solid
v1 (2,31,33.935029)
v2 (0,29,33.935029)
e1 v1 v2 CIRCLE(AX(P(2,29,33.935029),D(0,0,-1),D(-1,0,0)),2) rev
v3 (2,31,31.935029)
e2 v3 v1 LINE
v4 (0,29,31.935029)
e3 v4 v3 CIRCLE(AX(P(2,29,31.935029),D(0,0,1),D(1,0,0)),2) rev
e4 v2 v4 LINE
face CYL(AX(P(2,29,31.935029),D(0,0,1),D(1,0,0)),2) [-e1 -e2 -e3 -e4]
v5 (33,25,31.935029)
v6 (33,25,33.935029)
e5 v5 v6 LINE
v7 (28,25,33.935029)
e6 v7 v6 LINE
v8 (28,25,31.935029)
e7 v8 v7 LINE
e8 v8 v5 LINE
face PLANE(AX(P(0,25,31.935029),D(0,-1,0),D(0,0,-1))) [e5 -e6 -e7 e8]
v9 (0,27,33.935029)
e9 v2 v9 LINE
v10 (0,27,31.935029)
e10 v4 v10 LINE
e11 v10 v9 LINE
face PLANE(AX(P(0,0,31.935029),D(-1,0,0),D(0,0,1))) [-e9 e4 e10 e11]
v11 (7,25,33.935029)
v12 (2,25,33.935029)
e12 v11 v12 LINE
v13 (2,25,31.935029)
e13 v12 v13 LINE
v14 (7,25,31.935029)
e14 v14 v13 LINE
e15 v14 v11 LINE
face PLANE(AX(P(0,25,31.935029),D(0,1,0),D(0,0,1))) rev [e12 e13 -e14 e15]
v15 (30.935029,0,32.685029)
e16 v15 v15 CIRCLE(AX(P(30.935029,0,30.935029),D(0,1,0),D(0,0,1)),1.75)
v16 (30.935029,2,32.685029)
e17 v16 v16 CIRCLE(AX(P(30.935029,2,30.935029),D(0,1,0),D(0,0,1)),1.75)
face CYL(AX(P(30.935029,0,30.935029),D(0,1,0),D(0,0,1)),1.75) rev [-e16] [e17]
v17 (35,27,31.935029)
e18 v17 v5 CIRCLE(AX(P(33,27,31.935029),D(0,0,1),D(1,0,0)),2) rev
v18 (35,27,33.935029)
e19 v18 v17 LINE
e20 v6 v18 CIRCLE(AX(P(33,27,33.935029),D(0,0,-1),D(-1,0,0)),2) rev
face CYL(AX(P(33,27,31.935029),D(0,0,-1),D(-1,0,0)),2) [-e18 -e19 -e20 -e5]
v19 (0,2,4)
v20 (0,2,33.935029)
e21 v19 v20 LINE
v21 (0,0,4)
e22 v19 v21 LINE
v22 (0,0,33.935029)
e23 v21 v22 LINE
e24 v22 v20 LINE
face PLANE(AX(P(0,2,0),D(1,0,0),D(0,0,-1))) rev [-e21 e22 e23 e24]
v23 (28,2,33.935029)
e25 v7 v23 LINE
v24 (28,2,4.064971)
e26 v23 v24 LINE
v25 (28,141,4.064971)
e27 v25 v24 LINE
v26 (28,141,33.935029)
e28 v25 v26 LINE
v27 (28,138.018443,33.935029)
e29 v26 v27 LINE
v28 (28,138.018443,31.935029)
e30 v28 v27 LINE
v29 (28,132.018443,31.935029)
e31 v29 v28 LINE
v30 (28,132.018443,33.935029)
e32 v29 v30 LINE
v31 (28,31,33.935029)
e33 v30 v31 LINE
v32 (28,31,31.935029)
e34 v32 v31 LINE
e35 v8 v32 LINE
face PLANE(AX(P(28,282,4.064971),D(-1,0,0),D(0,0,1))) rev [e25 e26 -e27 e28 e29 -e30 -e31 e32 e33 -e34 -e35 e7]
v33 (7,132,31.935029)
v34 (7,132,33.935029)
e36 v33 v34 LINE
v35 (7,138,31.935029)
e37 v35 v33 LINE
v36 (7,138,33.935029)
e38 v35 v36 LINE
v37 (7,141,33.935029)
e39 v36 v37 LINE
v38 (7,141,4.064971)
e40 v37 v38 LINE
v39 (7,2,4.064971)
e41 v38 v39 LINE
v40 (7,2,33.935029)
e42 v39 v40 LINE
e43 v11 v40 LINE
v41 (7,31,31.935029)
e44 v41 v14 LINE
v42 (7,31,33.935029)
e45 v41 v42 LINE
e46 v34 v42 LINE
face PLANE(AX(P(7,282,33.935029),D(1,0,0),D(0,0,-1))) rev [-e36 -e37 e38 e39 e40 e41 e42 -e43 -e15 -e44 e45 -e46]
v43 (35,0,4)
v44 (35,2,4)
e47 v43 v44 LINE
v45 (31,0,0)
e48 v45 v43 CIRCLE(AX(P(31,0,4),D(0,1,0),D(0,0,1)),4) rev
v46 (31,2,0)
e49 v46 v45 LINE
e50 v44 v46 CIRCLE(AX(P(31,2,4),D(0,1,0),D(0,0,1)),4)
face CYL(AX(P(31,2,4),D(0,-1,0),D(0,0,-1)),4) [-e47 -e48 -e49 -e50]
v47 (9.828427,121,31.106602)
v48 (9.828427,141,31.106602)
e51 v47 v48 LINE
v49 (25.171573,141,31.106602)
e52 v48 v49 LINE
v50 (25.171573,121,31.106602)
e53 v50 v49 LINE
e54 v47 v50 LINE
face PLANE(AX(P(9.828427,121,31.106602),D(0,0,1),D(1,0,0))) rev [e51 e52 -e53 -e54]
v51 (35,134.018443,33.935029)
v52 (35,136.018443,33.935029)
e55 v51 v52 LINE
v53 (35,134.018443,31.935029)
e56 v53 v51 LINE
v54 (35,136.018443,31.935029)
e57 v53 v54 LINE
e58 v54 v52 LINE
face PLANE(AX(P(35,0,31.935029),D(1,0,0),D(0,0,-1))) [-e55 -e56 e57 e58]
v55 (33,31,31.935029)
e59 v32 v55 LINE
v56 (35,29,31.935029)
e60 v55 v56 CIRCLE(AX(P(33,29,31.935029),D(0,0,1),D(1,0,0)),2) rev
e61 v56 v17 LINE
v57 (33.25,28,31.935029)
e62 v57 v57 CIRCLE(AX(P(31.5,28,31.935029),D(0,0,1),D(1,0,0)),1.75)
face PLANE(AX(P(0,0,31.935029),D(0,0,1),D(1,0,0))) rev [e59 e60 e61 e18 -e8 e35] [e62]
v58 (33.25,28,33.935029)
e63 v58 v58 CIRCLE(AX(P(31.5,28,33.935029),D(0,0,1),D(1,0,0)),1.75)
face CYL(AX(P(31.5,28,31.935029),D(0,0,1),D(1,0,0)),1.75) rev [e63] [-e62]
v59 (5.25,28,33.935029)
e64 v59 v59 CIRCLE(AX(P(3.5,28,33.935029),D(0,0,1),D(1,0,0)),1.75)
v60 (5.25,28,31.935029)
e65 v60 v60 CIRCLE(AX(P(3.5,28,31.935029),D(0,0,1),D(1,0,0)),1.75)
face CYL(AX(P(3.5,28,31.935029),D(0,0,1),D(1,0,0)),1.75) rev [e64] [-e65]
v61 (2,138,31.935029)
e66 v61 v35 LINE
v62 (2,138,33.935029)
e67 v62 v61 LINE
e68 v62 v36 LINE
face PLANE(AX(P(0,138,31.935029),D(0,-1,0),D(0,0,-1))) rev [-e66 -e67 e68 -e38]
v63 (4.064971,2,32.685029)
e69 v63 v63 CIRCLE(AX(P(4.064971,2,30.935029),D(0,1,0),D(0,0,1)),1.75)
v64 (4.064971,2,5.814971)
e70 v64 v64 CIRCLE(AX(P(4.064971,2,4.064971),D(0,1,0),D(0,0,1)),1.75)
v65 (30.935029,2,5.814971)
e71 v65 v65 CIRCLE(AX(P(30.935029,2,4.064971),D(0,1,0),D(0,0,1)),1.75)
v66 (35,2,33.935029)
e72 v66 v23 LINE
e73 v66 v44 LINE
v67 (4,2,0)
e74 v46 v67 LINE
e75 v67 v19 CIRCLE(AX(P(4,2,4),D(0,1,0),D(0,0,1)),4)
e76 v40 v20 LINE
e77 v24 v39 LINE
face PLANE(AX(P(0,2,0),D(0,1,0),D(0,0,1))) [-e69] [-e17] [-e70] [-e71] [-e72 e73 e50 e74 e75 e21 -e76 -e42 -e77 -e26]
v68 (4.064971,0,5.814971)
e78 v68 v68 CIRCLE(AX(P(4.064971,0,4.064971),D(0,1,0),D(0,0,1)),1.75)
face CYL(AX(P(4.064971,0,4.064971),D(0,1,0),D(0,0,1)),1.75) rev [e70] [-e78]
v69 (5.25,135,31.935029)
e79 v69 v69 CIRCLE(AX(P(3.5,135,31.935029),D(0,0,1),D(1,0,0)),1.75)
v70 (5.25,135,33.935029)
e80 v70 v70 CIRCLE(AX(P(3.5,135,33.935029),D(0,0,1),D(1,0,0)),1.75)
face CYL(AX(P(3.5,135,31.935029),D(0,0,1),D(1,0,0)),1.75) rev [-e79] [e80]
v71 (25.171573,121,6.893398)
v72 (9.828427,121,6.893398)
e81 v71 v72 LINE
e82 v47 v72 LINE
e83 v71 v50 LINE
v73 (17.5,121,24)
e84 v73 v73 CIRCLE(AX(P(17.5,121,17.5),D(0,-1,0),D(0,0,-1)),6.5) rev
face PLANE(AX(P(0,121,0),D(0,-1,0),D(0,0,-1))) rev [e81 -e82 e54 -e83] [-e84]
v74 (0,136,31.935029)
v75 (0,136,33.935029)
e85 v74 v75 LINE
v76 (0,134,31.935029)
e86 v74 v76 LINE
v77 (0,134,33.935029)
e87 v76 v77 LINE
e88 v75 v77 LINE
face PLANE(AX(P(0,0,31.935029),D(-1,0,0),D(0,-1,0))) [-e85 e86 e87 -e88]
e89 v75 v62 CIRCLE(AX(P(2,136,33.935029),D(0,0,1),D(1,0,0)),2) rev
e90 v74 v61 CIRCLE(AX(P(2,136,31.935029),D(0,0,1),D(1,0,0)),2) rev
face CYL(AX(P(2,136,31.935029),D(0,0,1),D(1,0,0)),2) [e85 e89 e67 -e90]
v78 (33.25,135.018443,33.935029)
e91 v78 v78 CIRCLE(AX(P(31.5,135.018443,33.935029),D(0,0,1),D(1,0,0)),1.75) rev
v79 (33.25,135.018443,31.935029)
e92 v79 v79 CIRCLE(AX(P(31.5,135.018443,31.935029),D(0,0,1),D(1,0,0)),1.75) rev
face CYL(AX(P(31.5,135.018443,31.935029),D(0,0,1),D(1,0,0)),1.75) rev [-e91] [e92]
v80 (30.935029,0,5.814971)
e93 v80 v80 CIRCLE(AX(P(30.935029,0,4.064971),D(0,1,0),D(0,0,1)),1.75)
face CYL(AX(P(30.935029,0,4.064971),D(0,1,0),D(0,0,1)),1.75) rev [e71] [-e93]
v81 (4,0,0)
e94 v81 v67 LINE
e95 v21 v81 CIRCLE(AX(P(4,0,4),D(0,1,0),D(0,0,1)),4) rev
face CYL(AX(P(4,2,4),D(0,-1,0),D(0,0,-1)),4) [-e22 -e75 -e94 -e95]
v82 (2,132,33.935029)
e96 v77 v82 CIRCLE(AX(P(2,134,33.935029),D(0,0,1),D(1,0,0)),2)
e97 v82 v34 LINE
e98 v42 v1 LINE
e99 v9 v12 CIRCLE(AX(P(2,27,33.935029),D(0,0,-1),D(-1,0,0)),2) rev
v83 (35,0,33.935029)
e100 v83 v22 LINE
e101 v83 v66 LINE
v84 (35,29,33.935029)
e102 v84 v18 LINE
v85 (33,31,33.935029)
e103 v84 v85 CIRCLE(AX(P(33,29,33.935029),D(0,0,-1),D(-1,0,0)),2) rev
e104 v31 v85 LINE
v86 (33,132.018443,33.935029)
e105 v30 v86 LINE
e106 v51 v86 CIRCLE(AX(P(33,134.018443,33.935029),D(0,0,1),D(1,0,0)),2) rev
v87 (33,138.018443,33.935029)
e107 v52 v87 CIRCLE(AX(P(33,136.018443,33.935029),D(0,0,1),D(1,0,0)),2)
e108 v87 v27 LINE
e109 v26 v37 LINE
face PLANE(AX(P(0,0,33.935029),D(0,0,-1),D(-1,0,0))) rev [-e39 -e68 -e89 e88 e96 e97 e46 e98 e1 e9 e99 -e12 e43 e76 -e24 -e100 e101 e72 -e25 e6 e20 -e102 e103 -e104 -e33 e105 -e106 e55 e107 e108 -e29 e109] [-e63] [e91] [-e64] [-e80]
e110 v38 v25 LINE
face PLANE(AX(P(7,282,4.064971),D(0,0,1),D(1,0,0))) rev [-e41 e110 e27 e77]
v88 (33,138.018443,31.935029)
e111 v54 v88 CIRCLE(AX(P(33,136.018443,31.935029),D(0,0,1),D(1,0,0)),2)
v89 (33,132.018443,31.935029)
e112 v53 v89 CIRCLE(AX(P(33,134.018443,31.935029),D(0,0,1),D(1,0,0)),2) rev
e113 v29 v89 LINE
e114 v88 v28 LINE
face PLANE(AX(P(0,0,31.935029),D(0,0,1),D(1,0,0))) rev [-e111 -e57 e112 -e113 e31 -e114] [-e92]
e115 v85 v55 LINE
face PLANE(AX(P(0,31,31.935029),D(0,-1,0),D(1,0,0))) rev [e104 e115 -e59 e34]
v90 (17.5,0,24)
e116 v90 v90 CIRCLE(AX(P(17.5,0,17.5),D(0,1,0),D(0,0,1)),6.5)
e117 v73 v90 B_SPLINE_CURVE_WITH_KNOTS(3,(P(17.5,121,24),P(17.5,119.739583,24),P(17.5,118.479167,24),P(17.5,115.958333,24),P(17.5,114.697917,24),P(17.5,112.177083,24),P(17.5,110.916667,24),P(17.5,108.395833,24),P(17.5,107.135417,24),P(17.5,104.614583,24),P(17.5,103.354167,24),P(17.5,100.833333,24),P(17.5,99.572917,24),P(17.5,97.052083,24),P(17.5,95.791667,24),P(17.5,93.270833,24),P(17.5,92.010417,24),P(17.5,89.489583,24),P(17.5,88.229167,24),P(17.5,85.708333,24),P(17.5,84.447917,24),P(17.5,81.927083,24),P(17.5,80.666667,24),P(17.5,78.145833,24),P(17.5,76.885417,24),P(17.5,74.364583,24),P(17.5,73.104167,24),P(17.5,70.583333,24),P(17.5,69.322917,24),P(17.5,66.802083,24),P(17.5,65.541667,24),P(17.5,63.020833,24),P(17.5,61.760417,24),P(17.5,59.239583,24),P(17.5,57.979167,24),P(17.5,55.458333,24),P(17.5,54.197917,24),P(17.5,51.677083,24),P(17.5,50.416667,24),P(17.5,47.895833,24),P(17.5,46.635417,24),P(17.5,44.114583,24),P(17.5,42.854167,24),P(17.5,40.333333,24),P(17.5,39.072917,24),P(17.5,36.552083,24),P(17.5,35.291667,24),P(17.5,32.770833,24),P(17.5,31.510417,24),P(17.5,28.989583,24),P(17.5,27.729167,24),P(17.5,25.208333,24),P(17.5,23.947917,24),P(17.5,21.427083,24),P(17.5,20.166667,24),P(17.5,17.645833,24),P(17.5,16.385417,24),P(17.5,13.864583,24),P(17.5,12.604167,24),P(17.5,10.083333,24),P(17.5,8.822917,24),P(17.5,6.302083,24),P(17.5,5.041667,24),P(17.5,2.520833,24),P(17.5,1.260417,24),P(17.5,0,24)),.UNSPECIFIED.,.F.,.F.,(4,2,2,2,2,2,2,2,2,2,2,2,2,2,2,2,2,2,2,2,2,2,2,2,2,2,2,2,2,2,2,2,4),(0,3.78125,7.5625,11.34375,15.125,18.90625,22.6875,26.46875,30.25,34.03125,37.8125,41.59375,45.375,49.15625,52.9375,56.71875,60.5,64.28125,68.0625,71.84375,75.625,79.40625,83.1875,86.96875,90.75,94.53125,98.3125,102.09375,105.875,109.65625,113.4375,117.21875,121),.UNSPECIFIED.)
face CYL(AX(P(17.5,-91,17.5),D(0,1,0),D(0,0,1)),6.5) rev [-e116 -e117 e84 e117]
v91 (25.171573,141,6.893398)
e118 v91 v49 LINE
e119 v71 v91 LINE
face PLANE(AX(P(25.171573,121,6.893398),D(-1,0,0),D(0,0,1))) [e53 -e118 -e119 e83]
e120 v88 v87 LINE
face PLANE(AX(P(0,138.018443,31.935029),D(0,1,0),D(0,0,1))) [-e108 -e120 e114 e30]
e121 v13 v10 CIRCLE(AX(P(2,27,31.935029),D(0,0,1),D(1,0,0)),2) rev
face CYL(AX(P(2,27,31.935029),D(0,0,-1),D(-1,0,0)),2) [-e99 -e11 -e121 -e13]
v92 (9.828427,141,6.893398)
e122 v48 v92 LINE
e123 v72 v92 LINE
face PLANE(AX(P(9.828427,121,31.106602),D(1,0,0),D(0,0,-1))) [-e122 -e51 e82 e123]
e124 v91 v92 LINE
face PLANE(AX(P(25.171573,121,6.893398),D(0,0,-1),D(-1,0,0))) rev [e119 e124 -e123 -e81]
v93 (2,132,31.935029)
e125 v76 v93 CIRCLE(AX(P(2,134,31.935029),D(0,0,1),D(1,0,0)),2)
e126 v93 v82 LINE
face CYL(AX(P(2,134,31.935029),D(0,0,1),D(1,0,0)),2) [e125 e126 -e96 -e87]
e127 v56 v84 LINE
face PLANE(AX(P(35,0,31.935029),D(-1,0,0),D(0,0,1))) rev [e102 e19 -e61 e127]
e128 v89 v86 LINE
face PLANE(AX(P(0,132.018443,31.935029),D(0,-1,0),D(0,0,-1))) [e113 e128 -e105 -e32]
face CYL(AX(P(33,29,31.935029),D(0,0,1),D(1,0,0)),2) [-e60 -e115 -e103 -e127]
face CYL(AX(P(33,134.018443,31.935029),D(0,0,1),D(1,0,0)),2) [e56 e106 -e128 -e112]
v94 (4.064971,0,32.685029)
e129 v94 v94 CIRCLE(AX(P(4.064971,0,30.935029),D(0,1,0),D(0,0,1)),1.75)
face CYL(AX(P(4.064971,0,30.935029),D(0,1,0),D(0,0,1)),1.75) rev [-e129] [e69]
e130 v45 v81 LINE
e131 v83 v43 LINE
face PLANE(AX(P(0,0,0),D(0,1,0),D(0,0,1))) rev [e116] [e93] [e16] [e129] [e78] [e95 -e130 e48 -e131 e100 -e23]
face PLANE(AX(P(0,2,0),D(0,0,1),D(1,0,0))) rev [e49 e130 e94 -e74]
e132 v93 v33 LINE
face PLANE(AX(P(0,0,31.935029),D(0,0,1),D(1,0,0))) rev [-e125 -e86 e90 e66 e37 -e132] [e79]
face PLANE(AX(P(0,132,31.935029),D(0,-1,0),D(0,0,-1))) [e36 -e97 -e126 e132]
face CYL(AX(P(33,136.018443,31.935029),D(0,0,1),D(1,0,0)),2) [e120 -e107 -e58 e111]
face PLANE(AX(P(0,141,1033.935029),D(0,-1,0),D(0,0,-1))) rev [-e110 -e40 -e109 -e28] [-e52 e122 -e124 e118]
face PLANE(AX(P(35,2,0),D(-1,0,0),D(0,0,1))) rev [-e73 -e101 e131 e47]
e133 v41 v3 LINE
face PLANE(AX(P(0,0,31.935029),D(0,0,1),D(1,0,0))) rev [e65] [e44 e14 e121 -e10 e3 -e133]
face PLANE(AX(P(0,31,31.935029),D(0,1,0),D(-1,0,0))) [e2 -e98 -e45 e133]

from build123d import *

# Parameters (mm, degrees)
ESQUISSE1_W                   = 35
ESQUISSE1_H                   = 35
BOSS_EXTRU_1_DEPTH            = 2
ESQUISSE2_R                   = 1.75
ESQUISSE2_W                   = 35
ESQUISSE2_H                   = 1.064971157
ENL_V_MAT_EXTRU_1_DEPTH       = 2
BOSS_EXTRU_2_DEPTH            = 280
ESQUISSE5_W                   = 7
ESQUISSE5_H                   = 6
ESQUISSE5_R                   = 1.75
BOSS_EXTRU_3_DEPTH            = 2
ESQUISSE6_R                   = 1.75
BOSS_EXTRU_4_DEPTH            = 2
ESQUISSE10_W                  = 35
ESQUISSE10_H                  = 33.935028843
ESQUISSE10_R                  = 1.75
BOSS_EXTRU_5_DEPTH            = 2
ESQUISSE15_R                  = 6.5
ESQUISSE15_R_2                = 1.75
ENL_V_MAT_EXTRU_2_DEPTH       = 373
CONG_1_R                      = 2
CONG_2_R                      = 4
EXTRU_MINCE1_START            = -2
EXTRU_MINCE1_OUTLINE_W        = 35
EXTRU_MINCE1_OUTLINE_H        = 10
EXTRU_MINCE1_DEPTH            = 2
BOSS_EXTRU_7_DEPTH            = 62.5
BOSS_EXTRU_8_DEPTH            = 160
ENL_V_MAT_EXTRU_4_DEPTH       = 15
BOSS_EXTRU_31_DEPTH           = 69.5
BOSS_EXTRU_31_DEPTH_BACK      = 90.5
ESQUISSE29_W                  = 0.210775501
ESQUISSE29_H                  = 2
BOSS_EXTRU_32_DEPTH           = 160
ENL_V_MAT_EXTRU_7_DEPTH       = 10
ENL_V_MAT_EXTRU_7_DEPTH_BACK  = 5
ESQUISSE34_W                  = 144
ESQUISSE34_H                  = 64.710678118
ENL_V_MAT_EXTRU_8_DEPTH       = 2
ESQUISSE35_R                  = 1.5
BOSS_EXTRU_35_DEPTH           = 2
BOSS_EXTRU_36_START           = -2
ESQUISSE36_R                  = 1.5
BOSS_EXTRU_36_DEPTH           = 2
BOSS_EXTRU_37_DEPTH           = 21
BOSS_EXTRU_38_DEPTH           = 28
ESQUISSE42_W                  = 17
ESQUISSE42_H                  = 6
ENL_V_MAT_EXTRU_9_DEPTH       = 124
ESQUISSE43_R                  = 1.1
ENL_V_MAT_EXTRU_11_DEPTH      = 50
ESQUISSE45_R                  = 1.5
ENL_V_MAT_EXTRU_12_DEPTH      = 50
ESQUISSE47_R                  = 1.75
BOSS_EXTRU_40_DEPTH           = 2
ENL_V_MAT_EXTRU_13_DEPTH      = 2
ESQUISSE49_R                  = 1.75
BOSS_EXTRU_41_DEPTH           = 2
ESQUISSE50_W                  = 12.927363302
ESQUISSE50_H                  = 18
ENL_V_MAT_EXTRU_14_DEPTH      = 2
ESQUISSE51_R                  = 1.75
BOSS_EXTRU_42_DEPTH           = 2
ENL_V_MAT_EXTRU_15_DEPTH      = 1000
ENL_V_MAT_EXTRU_15_DEPTH_BACK = 1000
ESQUISSE53_W                  = 15.34314575
ESQUISSE53_H                  = 24.213203648
ENL_V_MAT_EXTRU_16_DEPTH      = 20


# Read off the part's stored shape, not the designer's step: Extru.-Mince1
with BuildPart() as part:
    # Esquisse1 → Boss.-Extru.1 (new body)
    with BuildSketch(Plane(origin=(0, 0, 0), x_dir=(1, 0, 0), z_dir=(0, 1, 0))):
        with Locations((17.5, -17.5)):
            Rectangle(ESQUISSE1_W, ESQUISSE1_H)
    extrude(amount=BOSS_EXTRU_1_DEPTH)

    # Esquisse2 → Enlèv. mat.-Extru.1 (cut)
    with BuildSketch(Plane(origin=(0, 2, 0), x_dir=(1, 0, 0), z_dir=(0, 1, 0))):
        with Locations(Location((30.935029054, -4.064971369, 0), (0, 0, 270))):
            Circle(ESQUISSE2_R)
        with Locations(Location((30.935028843, -30.935028843, 0), (0, 0, 270))):
            Circle(ESQUISSE2_R)
        with Locations(Location((4.064971369, -4.064970946, 0), (0, 0, 270))):
            Circle(ESQUISSE2_R)
        with Locations(Location((4.064971157, -30.935028843, 0), (0, 0, 270))):
            Circle(ESQUISSE2_R)
        with Locations((17.5, -34.467514421)):
            Rectangle(ESQUISSE2_W, ESQUISSE2_H)
    extrude(amount=-ENL_V_MAT_EXTRU_1_DEPTH, mode=Mode.SUBTRACT)

    # Esquisse4 → Boss.-Extru.2 (add)
    with BuildSketch(Plane(origin=(0, 2, 0), x_dir=(1, 0, 0), z_dir=(0, 1, 0))):
        Polygon((17.5, -33.935028843), (7, -33.935028843), (7, -4.064970946), (28, -4.064970946), (28, -33.935028843), align=None)
    extrude(amount=BOSS_EXTRU_2_DEPTH)

    # Esquisse5 → Boss.-Extru.3 (add)
    # profile 1 of 4: a face of its own
    with BuildSketch(Plane.XY.offset(33.935028843)):
        with Locations((31.5, 254)):
            Rectangle(ESQUISSE5_W, ESQUISSE5_H)
        with Locations((31.5, 254)):
            Circle(ESQUISSE5_R, mode=Mode.SUBTRACT)
    # profile 2 of 4: a face of its own
    with BuildSketch(Plane.XY.offset(33.935028843)):
        with Locations((3.5, 254)):
            Rectangle(ESQUISSE5_W, ESQUISSE5_H)
        with Locations((3.5, 254)):
            Circle(ESQUISSE5_R, mode=Mode.SUBTRACT)
    # profile 3 of 4: a face of its own
    with BuildSketch(Plane.XY.offset(33.935028843)):
        with Locations((31.5, 28)):
            Rectangle(ESQUISSE5_W, ESQUISSE5_H)
        with Locations((31.5, 28)):
            Circle(ESQUISSE5_R, mode=Mode.SUBTRACT)
    # profile 4 of 4: a face of its own
    with BuildSketch(Plane.XY.offset(33.935028843)):
        with Locations((3.5, 28)):
            Rectangle(ESQUISSE5_W, ESQUISSE5_H)
        with Locations((3.5, 28)):
            Circle(ESQUISSE5_R, mode=Mode.SUBTRACT)
    extrude(amount=-BOSS_EXTRU_3_DEPTH)

    # Esquisse6 → Boss.-Extru.4 (add)
    # profile 1 of 2: a face of its own
    with BuildSketch(Plane.XY.offset(33.935028843)):
        Polygon((7, 144), (0, 144), (0, 141), (0, 138), (7, 138), (7, 141), align=None)
        with Locations((3.5, 141)):
            Circle(ESQUISSE6_R, mode=Mode.SUBTRACT)
    # profile 2 of 2: a face of its own
    with BuildSketch(Plane.XY.offset(33.935028843)):
        Polygon((35, 144), (28, 144), (28, 141), (28, 138), (35, 138), (35, 141), align=None)
        with Locations((31.5, 141)):
            Circle(ESQUISSE6_R, mode=Mode.SUBTRACT)
    extrude(amount=-BOSS_EXTRU_4_DEPTH)

    # Esquisse10 → Boss.-Extru.5 (add)
    with BuildSketch(Plane(origin=(0, 282, 0), x_dir=(1, 0, 0), z_dir=(0, 1, 0))):
        with Locations((17.5, -16.967514422)):
            Rectangle(ESQUISSE10_W, ESQUISSE10_H)
        with Locations(Location((30.935028843, -30.935028843, 0), (0, 0, 270))):
            Circle(ESQUISSE10_R, mode=Mode.SUBTRACT)
        with Locations(Location((30.935028631, -4.064970946, 0), (0, 0, 270.000013863))):
            Circle(ESQUISSE10_R, mode=Mode.SUBTRACT)
        with Locations(Location((4.064970946, -4.064971369, 0), (0, 0, 270.000013863))):
            Circle(ESQUISSE10_R, mode=Mode.SUBTRACT)
        with Locations(Location((4.064971157, -30.935028843, 0), (0, 0, 270))):
            Circle(ESQUISSE10_R, mode=Mode.SUBTRACT)
    extrude(amount=-BOSS_EXTRU_5_DEPTH)

    # Esquisse15 → Enlèv. mat.-Extru.2 (cut)
    with BuildSketch(Plane(origin=(0, 282, 0), x_dir=(1, 0, 0), z_dir=(0, 1, 0))):
        with Locations(Location((17.5, -17.5, 0), (0, 0, 270))):
            Circle(ESQUISSE15_R)
        with Locations(Location((30.935029054, -4.064971369, 0), (0, 0, 270))):
            Circle(ESQUISSE15_R_2)
    extrude(amount=-ENL_V_MAT_EXTRU_2_DEPTH, mode=Mode.SUBTRACT)

    # Congé1
    cong_1_edges = [part.edges().sort_by_distance(p)[0] for p in [
        (0, 31, 32.935028843),
        (0, 25, 32.935028843),
        (0, 144, 32.935028843),
        (0, 138, 32.935028843),
        (35, 144, 32.935028843),
        (35, 138, 32.935028843),
        (35, 257, 32.935028843),
        (35, 251, 32.935028843),
        (0, 251, 32.935028843),
        (0, 257, 32.935028843),
        (35, 31, 32.935028843),
        (35, 25, 32.935028843),
    ]]
    fillet(cong_1_edges, radius=CONG_1_R)

    # Congé2
    cong_2_edges = [part.edges().sort_by_distance(p)[0] for p in [
        (35, 281, 0),
        (0, 281, 0),
        (0, 1, 0),
        (35, 1, 0),
    ]]
    fillet(cong_2_edges, radius=CONG_2_R)

    # Extru.-Mince1 outline → Extru.-Mince1 (add)
    with BuildSketch(Plane(origin=(0, 282, 0), x_dir=(1, 0, 0), z_dir=(0, 1, 0)).offset(EXTRU_MINCE1_START)):
        with Locations((17.5, -38.935028843)):
            Rectangle(EXTRU_MINCE1_OUTLINE_W, EXTRU_MINCE1_OUTLINE_H)
    extrude(amount=EXTRU_MINCE1_DEPTH)

    # Esquisse20 → Boss.-Extru.7 (add)
    with BuildSketch(Plane.ZY):
        Polygon((43.935028843, 282), (114.645706961, 211.289321881), (110.645706961, 211.289321881), (41.935028843, 280), (34.145804344, 280), (34.145804344, 282), align=None)
    extrude(amount=BOSS_EXTRU_7_DEPTH)

    # Esquisse21 → Boss.-Extru.8 (add)
    with BuildSketch(Plane.ZY.offset(62.5)):
        Polygon((34.145804344, 280), (41.935028843, 280), (110.645706961, 211.289321881), (114.645706961, 211.289321881), (43.935028843, 282), (34.145804344, 282), align=None)
    extrude(amount=-BOSS_EXTRU_8_DEPTH)

    # Esquisse22 → Enlèv. mat.-Extru.4 (cut)
    with BuildSketch(Plane(origin=(0, 162.967514421, 162.967514421), x_dir=(1, 0, 0), z_dir=(0, 0.7071067811865462, 0.7071067811865488))):
        Polygon((-42.064466094, 147.626821562), (-45.6, 147.626821562), (-45.6, 89.047889374), (-42.064466094, 89.047889374), (-42.064466094, 85.512355468), (77.064466094, 85.512355468), (77.064466094, 89.047889374), (80.6, 89.047889374), (80.6, 147.626821562), (77.064466094, 147.626821562), (77.064466094, 151.162355468), (-42.064466094, 151.162355468), align=None)
    extrude(amount=-ENL_V_MAT_EXTRU_4_DEPTH, mode=Mode.SUBTRACT)

    # Esquisse29 → Boss.-Extru.31 (add, two sides: drawn at the far end of the back side and taken through both)
    with BuildSketch(Plane.ZY.offset(-7).offset(-BOSS_EXTRU_31_DEPTH_BACK)):
        with Locations((34.040416594, 281)):
            Rectangle(ESQUISSE29_W, ESQUISSE29_H)
    extrude(amount=BOSS_EXTRU_31_DEPTH + BOSS_EXTRU_31_DEPTH_BACK)

    # Esquisse32 → Boss.-Extru.32 (add)
    with BuildSketch(Plane.ZY.offset(62.5)):
        Polygon((110.645706961, 211.289321881), (33.935028843, 211.289321881), (33.935028843, 280), (35.935028843, 280), (35.935028843, 213.289321881), (108.645706961, 213.289321881), align=None)
    extrude(amount=-BOSS_EXTRU_32_DEPTH)

    # Esquisse33 → Enlèv. mat.-Extru.7 (cut, two sides: drawn at the far end of the back side and taken through both)
    with BuildSketch(Plane(origin=(0, 0, 33.935028843), x_dir=(-1, 0, 0), z_dir=(0, 0, -1)).offset(-ENL_V_MAT_EXTRU_7_DEPTH_BACK)):
        Polygon((-28, 274.000000001), (-89.5, 274.000000001), (-89.5, 219.289321881), (-81.5, 219.289321881), (-28, 219.289321881), align=None)
        with BuildLine():
            Line((54.5, 274.000000001), (-7, 274.000000001))
            Line((-7, 274.000000001), (-7, 257))
            Line((-7, 257), (-2, 257))
            ThreePointArc((-2, 257), (-0.585786438, 256.414213562), (0, 255))
            Line((0, 255), (0, 253))
            ThreePointArc((0, 253), (-0.585786438, 251.585786438), (-2, 251))
            Line((-2, 251), (-7, 251))
            Line((-7, 251), (-7, 219.289321881))
            Line((-7, 219.289321881), (1, 219.289321881))
            Line((1, 219.289321881), (54.5, 219.289321881))
            Line((54.5, 219.289321881), (54.5, 274.000000001))
        make_face()
        with BuildLine():
            Line((-2, 257), (-7, 257))
            Line((-7, 257), (-7, 251))
            Line((-7, 251), (-2, 251))
            ThreePointArc((-2, 251), (-0.585786438, 251.585786438), (0, 253))
            Line((0, 253), (0, 255))
            ThreePointArc((0, 255), (-0.585786438, 256.414213562), (-2, 257))
        make_face()
    extrude(amount=ENL_V_MAT_EXTRU_7_DEPTH + ENL_V_MAT_EXTRU_7_DEPTH_BACK, mode=Mode.SUBTRACT)

    # Esquisse34 → Enlèv. mat.-Extru.8 (cut)
    with BuildSketch(Plane.XZ.offset(-211.289321881)):
        with Locations((17.5, 74.290367902)):
            Rectangle(ESQUISSE34_W, ESQUISSE34_H)
    extrude(amount=-ENL_V_MAT_EXTRU_8_DEPTH, mode=Mode.SUBTRACT)

    # Esquisse35 → Boss.-Extru.35 (add)
    with BuildSketch(Plane(origin=(97.5, 0, 0), x_dir=(0, 0, -1), z_dir=(1, 0, 0))):
        Polygon((-35.935028843, 280), (-35.935028843, 274.000000001), (-35.935028843, 213.289321881), (-108.645706961, 213.289321881), (-102.645706961, 219.289321881), (-41.935028842, 219.289321881), (-41.935028842, 274.000000001), (-47.935028841, 274.000000001), (-41.935028843, 280), align=None)
        with Locations((-38.935028842, 216.289321881)):
            Circle(ESQUISSE35_R, mode=Mode.SUBTRACT)
        with Locations((-38.935028842, 277.000000001)):
            Circle(ESQUISSE35_R, mode=Mode.SUBTRACT)
        with Locations((-99.645706961, 216.289321881)):
            Circle(ESQUISSE35_R, mode=Mode.SUBTRACT)
    extrude(amount=-BOSS_EXTRU_35_DEPTH)

    # Esquisse36 → Boss.-Extru.36 (add)
    with BuildSketch(Plane.ZY.offset(62.5).offset(BOSS_EXTRU_36_START)):
        Polygon((35.935028843, 213.289321881), (108.645706961, 213.289321881), (102.645706961, 219.289321881), (41.935028842, 219.289321881), (41.935028842, 274.000000001), (47.935028841, 274.000000001), (41.935028843, 280), (35.935028843, 280), (35.935028843, 274.000000001), align=None)
        with Locations(Location((99.645706961, 216.289321881, 0), (0, 0, 180))):
            Circle(ESQUISSE36_R, mode=Mode.SUBTRACT)
        with Locations(Location((38.935028842, 277.000000001, 0), (0, 0, 180))):
            Circle(ESQUISSE36_R, mode=Mode.SUBTRACT)
        with Locations(Location((38.935028842, 216.289321881, 0), (0, 0, 180))):
            Circle(ESQUISSE36_R, mode=Mode.SUBTRACT)
    extrude(amount=BOSS_EXTRU_36_DEPTH)

    # Esquisse39 → Boss.-Extru.37 (add)
    with BuildSketch(Plane(origin=(28, 0, 0), x_dir=(0, 0, -1), z_dir=(1, 0, 0))):
        Polygon((-33.935028843, 211.289321881), (-33.935028843, 191.289321881), (-118.935028843, 201.289321881), (-118.935028843, 211.289321881), align=None)
    extrude(amount=-BOSS_EXTRU_37_DEPTH)

    # Esquisse40 → Boss.-Extru.38 (add)
    with BuildSketch(Plane.XY.offset(118.935028843)):
        Polygon((7, 201.289321881), (2, 201.289321881), (2, 203.289321881), (33, 203.289321881), (33, 201.289321881), (28, 201.289321881), align=None)
    extrude(amount=BOSS_EXTRU_38_DEPTH)

    # Esquisse42 → Enlèv. mat.-Extru.9 (cut)
    with BuildSketch(Plane.XY.offset(118.935028843)):
        with Locations((17.5, 208.289321881)):
            Rectangle(ESQUISSE42_W, ESQUISSE42_H)
    extrude(amount=-ENL_V_MAT_EXTRU_9_DEPTH, mode=Mode.SUBTRACT)

    # Esquisse43 → Enlèv. mat.-Extru.11 (cut)
    with BuildSketch(Plane(origin=(0, 203.289321881, 0), x_dir=(1, 0, 0), z_dir=(0, 1, 0))):
        with Locations(Location((5, -144.935028843, 0), (0, 0, 270))):
            Circle(ESQUISSE43_R)
        with Locations(Location((30, -144.935028843, 0), (0, 0, 270))):
            Circle(ESQUISSE43_R)
        with Locations(Location((5, -130.435028843, 0), (0, 0, 270))):
            Circle(ESQUISSE43_R)
        with Locations(Location((30, -130.435028843, 0), (0, 0, 270))):
            Circle(ESQUISSE43_R)
        with BuildLine():
            Line((5, -123.319506434), (5, -128.435028843))
            ThreePointArc((5, -128.435028843), (7, -130.435028843), (5, -132.435028843))
            Line((5, -132.435028843), (5, -142.935028843))
            ThreePointArc((5, -142.935028843), (6.414213562, -143.52081528), (7, -144.935028843))
            Line((7, -144.935028843), (28, -144.935028843))
            ThreePointArc((28, -144.935028843), (28.585786438, -143.52081528), (30, -142.935028843))
            Line((30, -142.935028843), (30, -132.435028843))
            ThreePointArc((30, -132.435028843), (28, -130.435028843), (30, -128.435028843))
            Line((30, -128.435028843), (30, -123.319506434))
            Line((30, -123.319506434), (5, -123.319506434))
        make_face()
    extrude(amount=-ENL_V_MAT_EXTRU_11_DEPTH, mode=Mode.SUBTRACT)

    # Esquisse45 → Enlèv. mat.-Extru.12 (cut)
    with BuildSketch(Plane(origin=(0, 162.967514421, 162.967514421), x_dir=(1, 0, 0), z_dir=(0, 0.7071067811865462, 0.7071067811865488))):
        with Locations(Location((80.6, 151.162355468, 0), (0, 0, 270))):
            Circle(ESQUISSE45_R)
        with Locations(Location((80.6, 85.512355468, 0), (0, 0, 270))):
            Circle(ESQUISSE45_R)
        with Locations(Location((-45.6, 85.512355468, 0), (0, 0, 270))):
            Circle(ESQUISSE45_R)
        with Locations(Location((-45.6, 151.162355468, 0), (0, 0, 270))):
            Circle(ESQUISSE45_R)
    extrude(amount=-ENL_V_MAT_EXTRU_12_DEPTH, mode=Mode.SUBTRACT)

    # Esquisse47 → Boss.-Extru.40 (add)
    # profile 1 of 4: a face of its own
    with BuildSketch(Plane.XY.offset(33.935028843)):
        with BuildLine():
            Line((2, 144), (7, 144))
            Line((7, 144), (7, 150))
            Line((7, 150), (2, 150))
            ThreePointArc((2, 150), (0.585786438, 149.414213562), (0, 148))
            Line((0, 148), (0, 146))
            ThreePointArc((0, 146), (0.585786438, 144.585786438), (2, 144))
        make_face()
        with Locations((3.5, 147)):
            Circle(ESQUISSE47_R, mode=Mode.SUBTRACT)
    # profile 2 of 4: a face of its own
    with BuildSketch(Plane.XY.offset(33.935028843)):
        with BuildLine():
            Line((28, 150), (28, 144))
            Line((28, 144), (33, 144))
            ThreePointArc((33, 144), (34.414213562, 144.585786438), (35, 146))
            Line((35, 146), (35, 148))
            ThreePointArc((35, 148), (34.414213562, 149.414213562), (33, 150))
            Line((33, 150), (28, 150))
        make_face()
        with Locations((31.5, 147)):
            Circle(ESQUISSE47_R, mode=Mode.SUBTRACT)
    # profile 3 of 4: a face of its own
    with BuildSketch(Plane.XY.offset(33.935028843)):
        with BuildLine():
            Line((35, 134), (35, 136))
            ThreePointArc((35, 136), (34.414213562, 137.414213562), (33, 138))
            Line((33, 138), (28, 138))
            Line((28, 138), (28, 132))
            Line((28, 132), (33, 132))
            ThreePointArc((33, 132), (34.414213562, 132.585786438), (35, 134))
        make_face()
        with Locations((31.5, 135)):
            Circle(ESQUISSE47_R, mode=Mode.SUBTRACT)
    # profile 4 of 4: a face of its own
    with BuildSketch(Plane.XY.offset(33.935028843)):
        with BuildLine():
            Line((7, 138), (2, 138))
            ThreePointArc((2, 138), (0.585786438, 137.414213562), (0, 136))
            Line((0, 136), (0, 134))
            ThreePointArc((0, 134), (0.585786438, 132.585786438), (2, 132))
            Line((2, 132), (7, 132))
            Line((7, 132), (7, 138))
        make_face()
        with Locations((3.5, 135)):
            Circle(ESQUISSE47_R, mode=Mode.SUBTRACT)
    extrude(amount=-BOSS_EXTRU_40_DEPTH)

    # Esquisse48 → Enlèv. mat.-Extru.13 (cut)
    with BuildSketch(Plane.XY.offset(33.935028843)):
        Polygon((-4.556540033, 144), (-4.556540033, 138), (2, 138), (7, 138), (7, 144), (2, 144), align=None)
        Polygon((33.295178048, 144), (39.851718081, 144), (39.851718081, 138), (33.295178048, 138), (28.295178048, 138), (28.295178048, 144), align=None)
    extrude(amount=-ENL_V_MAT_EXTRU_13_DEPTH, mode=Mode.SUBTRACT)

    # Esquisse49 → Boss.-Extru.41 (add)
    # profile 1 of 2: a face of its own
    with BuildSketch(Plane.XY.offset(33.935028843)):
        with BuildLine():
            Line((2, 180.289321881), (7, 180.289321881))
            Line((7, 180.289321881), (7, 186.289321881))
            Line((7, 186.289321881), (2, 186.289321881))
            ThreePointArc((2, 186.289321881), (0.585786438, 185.703535444), (0, 184.289321881))
            Line((0, 184.289321881), (0, 182.289321881))
            ThreePointArc((0, 182.289321881), (0.585786438, 180.875108319), (2, 180.289321881))
        make_face()
        with Locations((3.5, 183.289321881)):
            Circle(ESQUISSE49_R, mode=Mode.SUBTRACT)
    # profile 2 of 2: a face of its own
    with BuildSketch(Plane.XY.offset(33.935028843)):
        with BuildLine():
            Line((35, 182.289321881), (35, 184.289321881))
            ThreePointArc((35, 184.289321881), (34.414213562, 185.703535444), (33, 186.289321881))
            Line((33, 186.289321881), (28, 186.289321881))
            Line((28, 186.289321881), (28, 180.289321881))
            Line((28, 180.289321881), (33, 180.289321881))
            ThreePointArc((33, 180.289321881), (34.414213562, 180.875108319), (35, 182.289321881))
        make_face()
        with Locations((31.5, 183.289321881)):
            Circle(ESQUISSE49_R, mode=Mode.SUBTRACT)
    extrude(amount=-BOSS_EXTRU_41_DEPTH)

    # Esquisse50 → Enlèv. mat.-Extru.14 (cut)
    with BuildSketch(Plane.XY.offset(33.935028843)):
        with Locations((34.463681651, 141)):
            Rectangle(ESQUISSE50_W, ESQUISSE50_H)
    extrude(amount=-ENL_V_MAT_EXTRU_14_DEPTH, mode=Mode.SUBTRACT)

    # Esquisse51 → Boss.-Extru.42 (add)
    # profile 1 of 3: a face of its own
    with BuildSketch(Plane.XY.offset(33.935028843)):
        with BuildLine():
            Line((7, 150), (7, 144))
            Line((7, 144), (2, 144))
            ThreePointArc((2, 144), (0.585786438, 144.585786438), (0, 146))
            Line((0, 146), (0, 148))
            ThreePointArc((0, 148), (0.585786438, 149.414213562), (2, 150))
            Line((2, 150), (7, 150))
        make_face()
        with Locations((3.5, 147)):
            Circle(ESQUISSE51_R, mode=Mode.SUBTRACT)
    # profile 2 of 3: a face of its own
    with BuildSketch(Plane.XY.offset(33.935028843)):
        with BuildLine():
            Line((33, 138.018442997), (28, 138.018442997))
            Line((28, 138.018442997), (28, 132.018442997))
            Line((28, 132.018442997), (33, 132.018442997))
            ThreePointArc((33, 132.018442997), (34.414213562, 132.604229434), (35, 134.018442997))
            Line((35, 134.018442997), (35, 136.018442997))
            ThreePointArc((35, 136.018442997), (34.414213562, 137.432656559), (33, 138.018442997))
        make_face()
        with Locations((31.5, 135.018442997)):
            Circle(ESQUISSE51_R, mode=Mode.SUBTRACT)
    # profile 3 of 3: a face of its own
    with BuildSketch(Plane.XY.offset(33.935028843)):
        with BuildLine():
            Line((33, 150), (28, 150))
            Line((28, 150), (28, 144))
            Line((28, 144), (33, 144))
            ThreePointArc((33, 144), (34.414213562, 144.585786438), (35, 146))
            Line((35, 146), (35, 148))
            ThreePointArc((35, 148), (34.414213562, 149.414213562), (33, 150))
        make_face()
        with Locations((31.5, 147)):
            Circle(ESQUISSE51_R, mode=Mode.SUBTRACT)
    extrude(amount=-BOSS_EXTRU_42_DEPTH)

    # Esquisse52 → Enlèv. mat.-Extru.15 (cut, two sides: drawn at the far end of the back side and taken through both)
    with BuildSketch(Plane.XY.offset(33.935028843).offset(-ENL_V_MAT_EXTRU_15_DEPTH_BACK)):
        Polygon((178.674523554, 141), (7, 141), (-154.270399125, 141), (-154.270399125, 365.360824734), (178.674523554, 365.360824734), align=None)
    extrude(amount=ENL_V_MAT_EXTRU_15_DEPTH + ENL_V_MAT_EXTRU_15_DEPTH_BACK, mode=Mode.SUBTRACT)

    # Esquisse53 → Enlèv. mat.-Extru.16 (cut)
    with BuildSketch(Plane(origin=(0, 141, 0), x_dir=(1, 0, 0), z_dir=(0, 1, 0))):
        with Locations((17.5, -18.999999894)):
            Rectangle(ESQUISSE53_W, ESQUISSE53_H)
    extrude(amount=-ENL_V_MAT_EXTRU_16_DEPTH, mode=Mode.SUBTRACT)


solid = part.part
